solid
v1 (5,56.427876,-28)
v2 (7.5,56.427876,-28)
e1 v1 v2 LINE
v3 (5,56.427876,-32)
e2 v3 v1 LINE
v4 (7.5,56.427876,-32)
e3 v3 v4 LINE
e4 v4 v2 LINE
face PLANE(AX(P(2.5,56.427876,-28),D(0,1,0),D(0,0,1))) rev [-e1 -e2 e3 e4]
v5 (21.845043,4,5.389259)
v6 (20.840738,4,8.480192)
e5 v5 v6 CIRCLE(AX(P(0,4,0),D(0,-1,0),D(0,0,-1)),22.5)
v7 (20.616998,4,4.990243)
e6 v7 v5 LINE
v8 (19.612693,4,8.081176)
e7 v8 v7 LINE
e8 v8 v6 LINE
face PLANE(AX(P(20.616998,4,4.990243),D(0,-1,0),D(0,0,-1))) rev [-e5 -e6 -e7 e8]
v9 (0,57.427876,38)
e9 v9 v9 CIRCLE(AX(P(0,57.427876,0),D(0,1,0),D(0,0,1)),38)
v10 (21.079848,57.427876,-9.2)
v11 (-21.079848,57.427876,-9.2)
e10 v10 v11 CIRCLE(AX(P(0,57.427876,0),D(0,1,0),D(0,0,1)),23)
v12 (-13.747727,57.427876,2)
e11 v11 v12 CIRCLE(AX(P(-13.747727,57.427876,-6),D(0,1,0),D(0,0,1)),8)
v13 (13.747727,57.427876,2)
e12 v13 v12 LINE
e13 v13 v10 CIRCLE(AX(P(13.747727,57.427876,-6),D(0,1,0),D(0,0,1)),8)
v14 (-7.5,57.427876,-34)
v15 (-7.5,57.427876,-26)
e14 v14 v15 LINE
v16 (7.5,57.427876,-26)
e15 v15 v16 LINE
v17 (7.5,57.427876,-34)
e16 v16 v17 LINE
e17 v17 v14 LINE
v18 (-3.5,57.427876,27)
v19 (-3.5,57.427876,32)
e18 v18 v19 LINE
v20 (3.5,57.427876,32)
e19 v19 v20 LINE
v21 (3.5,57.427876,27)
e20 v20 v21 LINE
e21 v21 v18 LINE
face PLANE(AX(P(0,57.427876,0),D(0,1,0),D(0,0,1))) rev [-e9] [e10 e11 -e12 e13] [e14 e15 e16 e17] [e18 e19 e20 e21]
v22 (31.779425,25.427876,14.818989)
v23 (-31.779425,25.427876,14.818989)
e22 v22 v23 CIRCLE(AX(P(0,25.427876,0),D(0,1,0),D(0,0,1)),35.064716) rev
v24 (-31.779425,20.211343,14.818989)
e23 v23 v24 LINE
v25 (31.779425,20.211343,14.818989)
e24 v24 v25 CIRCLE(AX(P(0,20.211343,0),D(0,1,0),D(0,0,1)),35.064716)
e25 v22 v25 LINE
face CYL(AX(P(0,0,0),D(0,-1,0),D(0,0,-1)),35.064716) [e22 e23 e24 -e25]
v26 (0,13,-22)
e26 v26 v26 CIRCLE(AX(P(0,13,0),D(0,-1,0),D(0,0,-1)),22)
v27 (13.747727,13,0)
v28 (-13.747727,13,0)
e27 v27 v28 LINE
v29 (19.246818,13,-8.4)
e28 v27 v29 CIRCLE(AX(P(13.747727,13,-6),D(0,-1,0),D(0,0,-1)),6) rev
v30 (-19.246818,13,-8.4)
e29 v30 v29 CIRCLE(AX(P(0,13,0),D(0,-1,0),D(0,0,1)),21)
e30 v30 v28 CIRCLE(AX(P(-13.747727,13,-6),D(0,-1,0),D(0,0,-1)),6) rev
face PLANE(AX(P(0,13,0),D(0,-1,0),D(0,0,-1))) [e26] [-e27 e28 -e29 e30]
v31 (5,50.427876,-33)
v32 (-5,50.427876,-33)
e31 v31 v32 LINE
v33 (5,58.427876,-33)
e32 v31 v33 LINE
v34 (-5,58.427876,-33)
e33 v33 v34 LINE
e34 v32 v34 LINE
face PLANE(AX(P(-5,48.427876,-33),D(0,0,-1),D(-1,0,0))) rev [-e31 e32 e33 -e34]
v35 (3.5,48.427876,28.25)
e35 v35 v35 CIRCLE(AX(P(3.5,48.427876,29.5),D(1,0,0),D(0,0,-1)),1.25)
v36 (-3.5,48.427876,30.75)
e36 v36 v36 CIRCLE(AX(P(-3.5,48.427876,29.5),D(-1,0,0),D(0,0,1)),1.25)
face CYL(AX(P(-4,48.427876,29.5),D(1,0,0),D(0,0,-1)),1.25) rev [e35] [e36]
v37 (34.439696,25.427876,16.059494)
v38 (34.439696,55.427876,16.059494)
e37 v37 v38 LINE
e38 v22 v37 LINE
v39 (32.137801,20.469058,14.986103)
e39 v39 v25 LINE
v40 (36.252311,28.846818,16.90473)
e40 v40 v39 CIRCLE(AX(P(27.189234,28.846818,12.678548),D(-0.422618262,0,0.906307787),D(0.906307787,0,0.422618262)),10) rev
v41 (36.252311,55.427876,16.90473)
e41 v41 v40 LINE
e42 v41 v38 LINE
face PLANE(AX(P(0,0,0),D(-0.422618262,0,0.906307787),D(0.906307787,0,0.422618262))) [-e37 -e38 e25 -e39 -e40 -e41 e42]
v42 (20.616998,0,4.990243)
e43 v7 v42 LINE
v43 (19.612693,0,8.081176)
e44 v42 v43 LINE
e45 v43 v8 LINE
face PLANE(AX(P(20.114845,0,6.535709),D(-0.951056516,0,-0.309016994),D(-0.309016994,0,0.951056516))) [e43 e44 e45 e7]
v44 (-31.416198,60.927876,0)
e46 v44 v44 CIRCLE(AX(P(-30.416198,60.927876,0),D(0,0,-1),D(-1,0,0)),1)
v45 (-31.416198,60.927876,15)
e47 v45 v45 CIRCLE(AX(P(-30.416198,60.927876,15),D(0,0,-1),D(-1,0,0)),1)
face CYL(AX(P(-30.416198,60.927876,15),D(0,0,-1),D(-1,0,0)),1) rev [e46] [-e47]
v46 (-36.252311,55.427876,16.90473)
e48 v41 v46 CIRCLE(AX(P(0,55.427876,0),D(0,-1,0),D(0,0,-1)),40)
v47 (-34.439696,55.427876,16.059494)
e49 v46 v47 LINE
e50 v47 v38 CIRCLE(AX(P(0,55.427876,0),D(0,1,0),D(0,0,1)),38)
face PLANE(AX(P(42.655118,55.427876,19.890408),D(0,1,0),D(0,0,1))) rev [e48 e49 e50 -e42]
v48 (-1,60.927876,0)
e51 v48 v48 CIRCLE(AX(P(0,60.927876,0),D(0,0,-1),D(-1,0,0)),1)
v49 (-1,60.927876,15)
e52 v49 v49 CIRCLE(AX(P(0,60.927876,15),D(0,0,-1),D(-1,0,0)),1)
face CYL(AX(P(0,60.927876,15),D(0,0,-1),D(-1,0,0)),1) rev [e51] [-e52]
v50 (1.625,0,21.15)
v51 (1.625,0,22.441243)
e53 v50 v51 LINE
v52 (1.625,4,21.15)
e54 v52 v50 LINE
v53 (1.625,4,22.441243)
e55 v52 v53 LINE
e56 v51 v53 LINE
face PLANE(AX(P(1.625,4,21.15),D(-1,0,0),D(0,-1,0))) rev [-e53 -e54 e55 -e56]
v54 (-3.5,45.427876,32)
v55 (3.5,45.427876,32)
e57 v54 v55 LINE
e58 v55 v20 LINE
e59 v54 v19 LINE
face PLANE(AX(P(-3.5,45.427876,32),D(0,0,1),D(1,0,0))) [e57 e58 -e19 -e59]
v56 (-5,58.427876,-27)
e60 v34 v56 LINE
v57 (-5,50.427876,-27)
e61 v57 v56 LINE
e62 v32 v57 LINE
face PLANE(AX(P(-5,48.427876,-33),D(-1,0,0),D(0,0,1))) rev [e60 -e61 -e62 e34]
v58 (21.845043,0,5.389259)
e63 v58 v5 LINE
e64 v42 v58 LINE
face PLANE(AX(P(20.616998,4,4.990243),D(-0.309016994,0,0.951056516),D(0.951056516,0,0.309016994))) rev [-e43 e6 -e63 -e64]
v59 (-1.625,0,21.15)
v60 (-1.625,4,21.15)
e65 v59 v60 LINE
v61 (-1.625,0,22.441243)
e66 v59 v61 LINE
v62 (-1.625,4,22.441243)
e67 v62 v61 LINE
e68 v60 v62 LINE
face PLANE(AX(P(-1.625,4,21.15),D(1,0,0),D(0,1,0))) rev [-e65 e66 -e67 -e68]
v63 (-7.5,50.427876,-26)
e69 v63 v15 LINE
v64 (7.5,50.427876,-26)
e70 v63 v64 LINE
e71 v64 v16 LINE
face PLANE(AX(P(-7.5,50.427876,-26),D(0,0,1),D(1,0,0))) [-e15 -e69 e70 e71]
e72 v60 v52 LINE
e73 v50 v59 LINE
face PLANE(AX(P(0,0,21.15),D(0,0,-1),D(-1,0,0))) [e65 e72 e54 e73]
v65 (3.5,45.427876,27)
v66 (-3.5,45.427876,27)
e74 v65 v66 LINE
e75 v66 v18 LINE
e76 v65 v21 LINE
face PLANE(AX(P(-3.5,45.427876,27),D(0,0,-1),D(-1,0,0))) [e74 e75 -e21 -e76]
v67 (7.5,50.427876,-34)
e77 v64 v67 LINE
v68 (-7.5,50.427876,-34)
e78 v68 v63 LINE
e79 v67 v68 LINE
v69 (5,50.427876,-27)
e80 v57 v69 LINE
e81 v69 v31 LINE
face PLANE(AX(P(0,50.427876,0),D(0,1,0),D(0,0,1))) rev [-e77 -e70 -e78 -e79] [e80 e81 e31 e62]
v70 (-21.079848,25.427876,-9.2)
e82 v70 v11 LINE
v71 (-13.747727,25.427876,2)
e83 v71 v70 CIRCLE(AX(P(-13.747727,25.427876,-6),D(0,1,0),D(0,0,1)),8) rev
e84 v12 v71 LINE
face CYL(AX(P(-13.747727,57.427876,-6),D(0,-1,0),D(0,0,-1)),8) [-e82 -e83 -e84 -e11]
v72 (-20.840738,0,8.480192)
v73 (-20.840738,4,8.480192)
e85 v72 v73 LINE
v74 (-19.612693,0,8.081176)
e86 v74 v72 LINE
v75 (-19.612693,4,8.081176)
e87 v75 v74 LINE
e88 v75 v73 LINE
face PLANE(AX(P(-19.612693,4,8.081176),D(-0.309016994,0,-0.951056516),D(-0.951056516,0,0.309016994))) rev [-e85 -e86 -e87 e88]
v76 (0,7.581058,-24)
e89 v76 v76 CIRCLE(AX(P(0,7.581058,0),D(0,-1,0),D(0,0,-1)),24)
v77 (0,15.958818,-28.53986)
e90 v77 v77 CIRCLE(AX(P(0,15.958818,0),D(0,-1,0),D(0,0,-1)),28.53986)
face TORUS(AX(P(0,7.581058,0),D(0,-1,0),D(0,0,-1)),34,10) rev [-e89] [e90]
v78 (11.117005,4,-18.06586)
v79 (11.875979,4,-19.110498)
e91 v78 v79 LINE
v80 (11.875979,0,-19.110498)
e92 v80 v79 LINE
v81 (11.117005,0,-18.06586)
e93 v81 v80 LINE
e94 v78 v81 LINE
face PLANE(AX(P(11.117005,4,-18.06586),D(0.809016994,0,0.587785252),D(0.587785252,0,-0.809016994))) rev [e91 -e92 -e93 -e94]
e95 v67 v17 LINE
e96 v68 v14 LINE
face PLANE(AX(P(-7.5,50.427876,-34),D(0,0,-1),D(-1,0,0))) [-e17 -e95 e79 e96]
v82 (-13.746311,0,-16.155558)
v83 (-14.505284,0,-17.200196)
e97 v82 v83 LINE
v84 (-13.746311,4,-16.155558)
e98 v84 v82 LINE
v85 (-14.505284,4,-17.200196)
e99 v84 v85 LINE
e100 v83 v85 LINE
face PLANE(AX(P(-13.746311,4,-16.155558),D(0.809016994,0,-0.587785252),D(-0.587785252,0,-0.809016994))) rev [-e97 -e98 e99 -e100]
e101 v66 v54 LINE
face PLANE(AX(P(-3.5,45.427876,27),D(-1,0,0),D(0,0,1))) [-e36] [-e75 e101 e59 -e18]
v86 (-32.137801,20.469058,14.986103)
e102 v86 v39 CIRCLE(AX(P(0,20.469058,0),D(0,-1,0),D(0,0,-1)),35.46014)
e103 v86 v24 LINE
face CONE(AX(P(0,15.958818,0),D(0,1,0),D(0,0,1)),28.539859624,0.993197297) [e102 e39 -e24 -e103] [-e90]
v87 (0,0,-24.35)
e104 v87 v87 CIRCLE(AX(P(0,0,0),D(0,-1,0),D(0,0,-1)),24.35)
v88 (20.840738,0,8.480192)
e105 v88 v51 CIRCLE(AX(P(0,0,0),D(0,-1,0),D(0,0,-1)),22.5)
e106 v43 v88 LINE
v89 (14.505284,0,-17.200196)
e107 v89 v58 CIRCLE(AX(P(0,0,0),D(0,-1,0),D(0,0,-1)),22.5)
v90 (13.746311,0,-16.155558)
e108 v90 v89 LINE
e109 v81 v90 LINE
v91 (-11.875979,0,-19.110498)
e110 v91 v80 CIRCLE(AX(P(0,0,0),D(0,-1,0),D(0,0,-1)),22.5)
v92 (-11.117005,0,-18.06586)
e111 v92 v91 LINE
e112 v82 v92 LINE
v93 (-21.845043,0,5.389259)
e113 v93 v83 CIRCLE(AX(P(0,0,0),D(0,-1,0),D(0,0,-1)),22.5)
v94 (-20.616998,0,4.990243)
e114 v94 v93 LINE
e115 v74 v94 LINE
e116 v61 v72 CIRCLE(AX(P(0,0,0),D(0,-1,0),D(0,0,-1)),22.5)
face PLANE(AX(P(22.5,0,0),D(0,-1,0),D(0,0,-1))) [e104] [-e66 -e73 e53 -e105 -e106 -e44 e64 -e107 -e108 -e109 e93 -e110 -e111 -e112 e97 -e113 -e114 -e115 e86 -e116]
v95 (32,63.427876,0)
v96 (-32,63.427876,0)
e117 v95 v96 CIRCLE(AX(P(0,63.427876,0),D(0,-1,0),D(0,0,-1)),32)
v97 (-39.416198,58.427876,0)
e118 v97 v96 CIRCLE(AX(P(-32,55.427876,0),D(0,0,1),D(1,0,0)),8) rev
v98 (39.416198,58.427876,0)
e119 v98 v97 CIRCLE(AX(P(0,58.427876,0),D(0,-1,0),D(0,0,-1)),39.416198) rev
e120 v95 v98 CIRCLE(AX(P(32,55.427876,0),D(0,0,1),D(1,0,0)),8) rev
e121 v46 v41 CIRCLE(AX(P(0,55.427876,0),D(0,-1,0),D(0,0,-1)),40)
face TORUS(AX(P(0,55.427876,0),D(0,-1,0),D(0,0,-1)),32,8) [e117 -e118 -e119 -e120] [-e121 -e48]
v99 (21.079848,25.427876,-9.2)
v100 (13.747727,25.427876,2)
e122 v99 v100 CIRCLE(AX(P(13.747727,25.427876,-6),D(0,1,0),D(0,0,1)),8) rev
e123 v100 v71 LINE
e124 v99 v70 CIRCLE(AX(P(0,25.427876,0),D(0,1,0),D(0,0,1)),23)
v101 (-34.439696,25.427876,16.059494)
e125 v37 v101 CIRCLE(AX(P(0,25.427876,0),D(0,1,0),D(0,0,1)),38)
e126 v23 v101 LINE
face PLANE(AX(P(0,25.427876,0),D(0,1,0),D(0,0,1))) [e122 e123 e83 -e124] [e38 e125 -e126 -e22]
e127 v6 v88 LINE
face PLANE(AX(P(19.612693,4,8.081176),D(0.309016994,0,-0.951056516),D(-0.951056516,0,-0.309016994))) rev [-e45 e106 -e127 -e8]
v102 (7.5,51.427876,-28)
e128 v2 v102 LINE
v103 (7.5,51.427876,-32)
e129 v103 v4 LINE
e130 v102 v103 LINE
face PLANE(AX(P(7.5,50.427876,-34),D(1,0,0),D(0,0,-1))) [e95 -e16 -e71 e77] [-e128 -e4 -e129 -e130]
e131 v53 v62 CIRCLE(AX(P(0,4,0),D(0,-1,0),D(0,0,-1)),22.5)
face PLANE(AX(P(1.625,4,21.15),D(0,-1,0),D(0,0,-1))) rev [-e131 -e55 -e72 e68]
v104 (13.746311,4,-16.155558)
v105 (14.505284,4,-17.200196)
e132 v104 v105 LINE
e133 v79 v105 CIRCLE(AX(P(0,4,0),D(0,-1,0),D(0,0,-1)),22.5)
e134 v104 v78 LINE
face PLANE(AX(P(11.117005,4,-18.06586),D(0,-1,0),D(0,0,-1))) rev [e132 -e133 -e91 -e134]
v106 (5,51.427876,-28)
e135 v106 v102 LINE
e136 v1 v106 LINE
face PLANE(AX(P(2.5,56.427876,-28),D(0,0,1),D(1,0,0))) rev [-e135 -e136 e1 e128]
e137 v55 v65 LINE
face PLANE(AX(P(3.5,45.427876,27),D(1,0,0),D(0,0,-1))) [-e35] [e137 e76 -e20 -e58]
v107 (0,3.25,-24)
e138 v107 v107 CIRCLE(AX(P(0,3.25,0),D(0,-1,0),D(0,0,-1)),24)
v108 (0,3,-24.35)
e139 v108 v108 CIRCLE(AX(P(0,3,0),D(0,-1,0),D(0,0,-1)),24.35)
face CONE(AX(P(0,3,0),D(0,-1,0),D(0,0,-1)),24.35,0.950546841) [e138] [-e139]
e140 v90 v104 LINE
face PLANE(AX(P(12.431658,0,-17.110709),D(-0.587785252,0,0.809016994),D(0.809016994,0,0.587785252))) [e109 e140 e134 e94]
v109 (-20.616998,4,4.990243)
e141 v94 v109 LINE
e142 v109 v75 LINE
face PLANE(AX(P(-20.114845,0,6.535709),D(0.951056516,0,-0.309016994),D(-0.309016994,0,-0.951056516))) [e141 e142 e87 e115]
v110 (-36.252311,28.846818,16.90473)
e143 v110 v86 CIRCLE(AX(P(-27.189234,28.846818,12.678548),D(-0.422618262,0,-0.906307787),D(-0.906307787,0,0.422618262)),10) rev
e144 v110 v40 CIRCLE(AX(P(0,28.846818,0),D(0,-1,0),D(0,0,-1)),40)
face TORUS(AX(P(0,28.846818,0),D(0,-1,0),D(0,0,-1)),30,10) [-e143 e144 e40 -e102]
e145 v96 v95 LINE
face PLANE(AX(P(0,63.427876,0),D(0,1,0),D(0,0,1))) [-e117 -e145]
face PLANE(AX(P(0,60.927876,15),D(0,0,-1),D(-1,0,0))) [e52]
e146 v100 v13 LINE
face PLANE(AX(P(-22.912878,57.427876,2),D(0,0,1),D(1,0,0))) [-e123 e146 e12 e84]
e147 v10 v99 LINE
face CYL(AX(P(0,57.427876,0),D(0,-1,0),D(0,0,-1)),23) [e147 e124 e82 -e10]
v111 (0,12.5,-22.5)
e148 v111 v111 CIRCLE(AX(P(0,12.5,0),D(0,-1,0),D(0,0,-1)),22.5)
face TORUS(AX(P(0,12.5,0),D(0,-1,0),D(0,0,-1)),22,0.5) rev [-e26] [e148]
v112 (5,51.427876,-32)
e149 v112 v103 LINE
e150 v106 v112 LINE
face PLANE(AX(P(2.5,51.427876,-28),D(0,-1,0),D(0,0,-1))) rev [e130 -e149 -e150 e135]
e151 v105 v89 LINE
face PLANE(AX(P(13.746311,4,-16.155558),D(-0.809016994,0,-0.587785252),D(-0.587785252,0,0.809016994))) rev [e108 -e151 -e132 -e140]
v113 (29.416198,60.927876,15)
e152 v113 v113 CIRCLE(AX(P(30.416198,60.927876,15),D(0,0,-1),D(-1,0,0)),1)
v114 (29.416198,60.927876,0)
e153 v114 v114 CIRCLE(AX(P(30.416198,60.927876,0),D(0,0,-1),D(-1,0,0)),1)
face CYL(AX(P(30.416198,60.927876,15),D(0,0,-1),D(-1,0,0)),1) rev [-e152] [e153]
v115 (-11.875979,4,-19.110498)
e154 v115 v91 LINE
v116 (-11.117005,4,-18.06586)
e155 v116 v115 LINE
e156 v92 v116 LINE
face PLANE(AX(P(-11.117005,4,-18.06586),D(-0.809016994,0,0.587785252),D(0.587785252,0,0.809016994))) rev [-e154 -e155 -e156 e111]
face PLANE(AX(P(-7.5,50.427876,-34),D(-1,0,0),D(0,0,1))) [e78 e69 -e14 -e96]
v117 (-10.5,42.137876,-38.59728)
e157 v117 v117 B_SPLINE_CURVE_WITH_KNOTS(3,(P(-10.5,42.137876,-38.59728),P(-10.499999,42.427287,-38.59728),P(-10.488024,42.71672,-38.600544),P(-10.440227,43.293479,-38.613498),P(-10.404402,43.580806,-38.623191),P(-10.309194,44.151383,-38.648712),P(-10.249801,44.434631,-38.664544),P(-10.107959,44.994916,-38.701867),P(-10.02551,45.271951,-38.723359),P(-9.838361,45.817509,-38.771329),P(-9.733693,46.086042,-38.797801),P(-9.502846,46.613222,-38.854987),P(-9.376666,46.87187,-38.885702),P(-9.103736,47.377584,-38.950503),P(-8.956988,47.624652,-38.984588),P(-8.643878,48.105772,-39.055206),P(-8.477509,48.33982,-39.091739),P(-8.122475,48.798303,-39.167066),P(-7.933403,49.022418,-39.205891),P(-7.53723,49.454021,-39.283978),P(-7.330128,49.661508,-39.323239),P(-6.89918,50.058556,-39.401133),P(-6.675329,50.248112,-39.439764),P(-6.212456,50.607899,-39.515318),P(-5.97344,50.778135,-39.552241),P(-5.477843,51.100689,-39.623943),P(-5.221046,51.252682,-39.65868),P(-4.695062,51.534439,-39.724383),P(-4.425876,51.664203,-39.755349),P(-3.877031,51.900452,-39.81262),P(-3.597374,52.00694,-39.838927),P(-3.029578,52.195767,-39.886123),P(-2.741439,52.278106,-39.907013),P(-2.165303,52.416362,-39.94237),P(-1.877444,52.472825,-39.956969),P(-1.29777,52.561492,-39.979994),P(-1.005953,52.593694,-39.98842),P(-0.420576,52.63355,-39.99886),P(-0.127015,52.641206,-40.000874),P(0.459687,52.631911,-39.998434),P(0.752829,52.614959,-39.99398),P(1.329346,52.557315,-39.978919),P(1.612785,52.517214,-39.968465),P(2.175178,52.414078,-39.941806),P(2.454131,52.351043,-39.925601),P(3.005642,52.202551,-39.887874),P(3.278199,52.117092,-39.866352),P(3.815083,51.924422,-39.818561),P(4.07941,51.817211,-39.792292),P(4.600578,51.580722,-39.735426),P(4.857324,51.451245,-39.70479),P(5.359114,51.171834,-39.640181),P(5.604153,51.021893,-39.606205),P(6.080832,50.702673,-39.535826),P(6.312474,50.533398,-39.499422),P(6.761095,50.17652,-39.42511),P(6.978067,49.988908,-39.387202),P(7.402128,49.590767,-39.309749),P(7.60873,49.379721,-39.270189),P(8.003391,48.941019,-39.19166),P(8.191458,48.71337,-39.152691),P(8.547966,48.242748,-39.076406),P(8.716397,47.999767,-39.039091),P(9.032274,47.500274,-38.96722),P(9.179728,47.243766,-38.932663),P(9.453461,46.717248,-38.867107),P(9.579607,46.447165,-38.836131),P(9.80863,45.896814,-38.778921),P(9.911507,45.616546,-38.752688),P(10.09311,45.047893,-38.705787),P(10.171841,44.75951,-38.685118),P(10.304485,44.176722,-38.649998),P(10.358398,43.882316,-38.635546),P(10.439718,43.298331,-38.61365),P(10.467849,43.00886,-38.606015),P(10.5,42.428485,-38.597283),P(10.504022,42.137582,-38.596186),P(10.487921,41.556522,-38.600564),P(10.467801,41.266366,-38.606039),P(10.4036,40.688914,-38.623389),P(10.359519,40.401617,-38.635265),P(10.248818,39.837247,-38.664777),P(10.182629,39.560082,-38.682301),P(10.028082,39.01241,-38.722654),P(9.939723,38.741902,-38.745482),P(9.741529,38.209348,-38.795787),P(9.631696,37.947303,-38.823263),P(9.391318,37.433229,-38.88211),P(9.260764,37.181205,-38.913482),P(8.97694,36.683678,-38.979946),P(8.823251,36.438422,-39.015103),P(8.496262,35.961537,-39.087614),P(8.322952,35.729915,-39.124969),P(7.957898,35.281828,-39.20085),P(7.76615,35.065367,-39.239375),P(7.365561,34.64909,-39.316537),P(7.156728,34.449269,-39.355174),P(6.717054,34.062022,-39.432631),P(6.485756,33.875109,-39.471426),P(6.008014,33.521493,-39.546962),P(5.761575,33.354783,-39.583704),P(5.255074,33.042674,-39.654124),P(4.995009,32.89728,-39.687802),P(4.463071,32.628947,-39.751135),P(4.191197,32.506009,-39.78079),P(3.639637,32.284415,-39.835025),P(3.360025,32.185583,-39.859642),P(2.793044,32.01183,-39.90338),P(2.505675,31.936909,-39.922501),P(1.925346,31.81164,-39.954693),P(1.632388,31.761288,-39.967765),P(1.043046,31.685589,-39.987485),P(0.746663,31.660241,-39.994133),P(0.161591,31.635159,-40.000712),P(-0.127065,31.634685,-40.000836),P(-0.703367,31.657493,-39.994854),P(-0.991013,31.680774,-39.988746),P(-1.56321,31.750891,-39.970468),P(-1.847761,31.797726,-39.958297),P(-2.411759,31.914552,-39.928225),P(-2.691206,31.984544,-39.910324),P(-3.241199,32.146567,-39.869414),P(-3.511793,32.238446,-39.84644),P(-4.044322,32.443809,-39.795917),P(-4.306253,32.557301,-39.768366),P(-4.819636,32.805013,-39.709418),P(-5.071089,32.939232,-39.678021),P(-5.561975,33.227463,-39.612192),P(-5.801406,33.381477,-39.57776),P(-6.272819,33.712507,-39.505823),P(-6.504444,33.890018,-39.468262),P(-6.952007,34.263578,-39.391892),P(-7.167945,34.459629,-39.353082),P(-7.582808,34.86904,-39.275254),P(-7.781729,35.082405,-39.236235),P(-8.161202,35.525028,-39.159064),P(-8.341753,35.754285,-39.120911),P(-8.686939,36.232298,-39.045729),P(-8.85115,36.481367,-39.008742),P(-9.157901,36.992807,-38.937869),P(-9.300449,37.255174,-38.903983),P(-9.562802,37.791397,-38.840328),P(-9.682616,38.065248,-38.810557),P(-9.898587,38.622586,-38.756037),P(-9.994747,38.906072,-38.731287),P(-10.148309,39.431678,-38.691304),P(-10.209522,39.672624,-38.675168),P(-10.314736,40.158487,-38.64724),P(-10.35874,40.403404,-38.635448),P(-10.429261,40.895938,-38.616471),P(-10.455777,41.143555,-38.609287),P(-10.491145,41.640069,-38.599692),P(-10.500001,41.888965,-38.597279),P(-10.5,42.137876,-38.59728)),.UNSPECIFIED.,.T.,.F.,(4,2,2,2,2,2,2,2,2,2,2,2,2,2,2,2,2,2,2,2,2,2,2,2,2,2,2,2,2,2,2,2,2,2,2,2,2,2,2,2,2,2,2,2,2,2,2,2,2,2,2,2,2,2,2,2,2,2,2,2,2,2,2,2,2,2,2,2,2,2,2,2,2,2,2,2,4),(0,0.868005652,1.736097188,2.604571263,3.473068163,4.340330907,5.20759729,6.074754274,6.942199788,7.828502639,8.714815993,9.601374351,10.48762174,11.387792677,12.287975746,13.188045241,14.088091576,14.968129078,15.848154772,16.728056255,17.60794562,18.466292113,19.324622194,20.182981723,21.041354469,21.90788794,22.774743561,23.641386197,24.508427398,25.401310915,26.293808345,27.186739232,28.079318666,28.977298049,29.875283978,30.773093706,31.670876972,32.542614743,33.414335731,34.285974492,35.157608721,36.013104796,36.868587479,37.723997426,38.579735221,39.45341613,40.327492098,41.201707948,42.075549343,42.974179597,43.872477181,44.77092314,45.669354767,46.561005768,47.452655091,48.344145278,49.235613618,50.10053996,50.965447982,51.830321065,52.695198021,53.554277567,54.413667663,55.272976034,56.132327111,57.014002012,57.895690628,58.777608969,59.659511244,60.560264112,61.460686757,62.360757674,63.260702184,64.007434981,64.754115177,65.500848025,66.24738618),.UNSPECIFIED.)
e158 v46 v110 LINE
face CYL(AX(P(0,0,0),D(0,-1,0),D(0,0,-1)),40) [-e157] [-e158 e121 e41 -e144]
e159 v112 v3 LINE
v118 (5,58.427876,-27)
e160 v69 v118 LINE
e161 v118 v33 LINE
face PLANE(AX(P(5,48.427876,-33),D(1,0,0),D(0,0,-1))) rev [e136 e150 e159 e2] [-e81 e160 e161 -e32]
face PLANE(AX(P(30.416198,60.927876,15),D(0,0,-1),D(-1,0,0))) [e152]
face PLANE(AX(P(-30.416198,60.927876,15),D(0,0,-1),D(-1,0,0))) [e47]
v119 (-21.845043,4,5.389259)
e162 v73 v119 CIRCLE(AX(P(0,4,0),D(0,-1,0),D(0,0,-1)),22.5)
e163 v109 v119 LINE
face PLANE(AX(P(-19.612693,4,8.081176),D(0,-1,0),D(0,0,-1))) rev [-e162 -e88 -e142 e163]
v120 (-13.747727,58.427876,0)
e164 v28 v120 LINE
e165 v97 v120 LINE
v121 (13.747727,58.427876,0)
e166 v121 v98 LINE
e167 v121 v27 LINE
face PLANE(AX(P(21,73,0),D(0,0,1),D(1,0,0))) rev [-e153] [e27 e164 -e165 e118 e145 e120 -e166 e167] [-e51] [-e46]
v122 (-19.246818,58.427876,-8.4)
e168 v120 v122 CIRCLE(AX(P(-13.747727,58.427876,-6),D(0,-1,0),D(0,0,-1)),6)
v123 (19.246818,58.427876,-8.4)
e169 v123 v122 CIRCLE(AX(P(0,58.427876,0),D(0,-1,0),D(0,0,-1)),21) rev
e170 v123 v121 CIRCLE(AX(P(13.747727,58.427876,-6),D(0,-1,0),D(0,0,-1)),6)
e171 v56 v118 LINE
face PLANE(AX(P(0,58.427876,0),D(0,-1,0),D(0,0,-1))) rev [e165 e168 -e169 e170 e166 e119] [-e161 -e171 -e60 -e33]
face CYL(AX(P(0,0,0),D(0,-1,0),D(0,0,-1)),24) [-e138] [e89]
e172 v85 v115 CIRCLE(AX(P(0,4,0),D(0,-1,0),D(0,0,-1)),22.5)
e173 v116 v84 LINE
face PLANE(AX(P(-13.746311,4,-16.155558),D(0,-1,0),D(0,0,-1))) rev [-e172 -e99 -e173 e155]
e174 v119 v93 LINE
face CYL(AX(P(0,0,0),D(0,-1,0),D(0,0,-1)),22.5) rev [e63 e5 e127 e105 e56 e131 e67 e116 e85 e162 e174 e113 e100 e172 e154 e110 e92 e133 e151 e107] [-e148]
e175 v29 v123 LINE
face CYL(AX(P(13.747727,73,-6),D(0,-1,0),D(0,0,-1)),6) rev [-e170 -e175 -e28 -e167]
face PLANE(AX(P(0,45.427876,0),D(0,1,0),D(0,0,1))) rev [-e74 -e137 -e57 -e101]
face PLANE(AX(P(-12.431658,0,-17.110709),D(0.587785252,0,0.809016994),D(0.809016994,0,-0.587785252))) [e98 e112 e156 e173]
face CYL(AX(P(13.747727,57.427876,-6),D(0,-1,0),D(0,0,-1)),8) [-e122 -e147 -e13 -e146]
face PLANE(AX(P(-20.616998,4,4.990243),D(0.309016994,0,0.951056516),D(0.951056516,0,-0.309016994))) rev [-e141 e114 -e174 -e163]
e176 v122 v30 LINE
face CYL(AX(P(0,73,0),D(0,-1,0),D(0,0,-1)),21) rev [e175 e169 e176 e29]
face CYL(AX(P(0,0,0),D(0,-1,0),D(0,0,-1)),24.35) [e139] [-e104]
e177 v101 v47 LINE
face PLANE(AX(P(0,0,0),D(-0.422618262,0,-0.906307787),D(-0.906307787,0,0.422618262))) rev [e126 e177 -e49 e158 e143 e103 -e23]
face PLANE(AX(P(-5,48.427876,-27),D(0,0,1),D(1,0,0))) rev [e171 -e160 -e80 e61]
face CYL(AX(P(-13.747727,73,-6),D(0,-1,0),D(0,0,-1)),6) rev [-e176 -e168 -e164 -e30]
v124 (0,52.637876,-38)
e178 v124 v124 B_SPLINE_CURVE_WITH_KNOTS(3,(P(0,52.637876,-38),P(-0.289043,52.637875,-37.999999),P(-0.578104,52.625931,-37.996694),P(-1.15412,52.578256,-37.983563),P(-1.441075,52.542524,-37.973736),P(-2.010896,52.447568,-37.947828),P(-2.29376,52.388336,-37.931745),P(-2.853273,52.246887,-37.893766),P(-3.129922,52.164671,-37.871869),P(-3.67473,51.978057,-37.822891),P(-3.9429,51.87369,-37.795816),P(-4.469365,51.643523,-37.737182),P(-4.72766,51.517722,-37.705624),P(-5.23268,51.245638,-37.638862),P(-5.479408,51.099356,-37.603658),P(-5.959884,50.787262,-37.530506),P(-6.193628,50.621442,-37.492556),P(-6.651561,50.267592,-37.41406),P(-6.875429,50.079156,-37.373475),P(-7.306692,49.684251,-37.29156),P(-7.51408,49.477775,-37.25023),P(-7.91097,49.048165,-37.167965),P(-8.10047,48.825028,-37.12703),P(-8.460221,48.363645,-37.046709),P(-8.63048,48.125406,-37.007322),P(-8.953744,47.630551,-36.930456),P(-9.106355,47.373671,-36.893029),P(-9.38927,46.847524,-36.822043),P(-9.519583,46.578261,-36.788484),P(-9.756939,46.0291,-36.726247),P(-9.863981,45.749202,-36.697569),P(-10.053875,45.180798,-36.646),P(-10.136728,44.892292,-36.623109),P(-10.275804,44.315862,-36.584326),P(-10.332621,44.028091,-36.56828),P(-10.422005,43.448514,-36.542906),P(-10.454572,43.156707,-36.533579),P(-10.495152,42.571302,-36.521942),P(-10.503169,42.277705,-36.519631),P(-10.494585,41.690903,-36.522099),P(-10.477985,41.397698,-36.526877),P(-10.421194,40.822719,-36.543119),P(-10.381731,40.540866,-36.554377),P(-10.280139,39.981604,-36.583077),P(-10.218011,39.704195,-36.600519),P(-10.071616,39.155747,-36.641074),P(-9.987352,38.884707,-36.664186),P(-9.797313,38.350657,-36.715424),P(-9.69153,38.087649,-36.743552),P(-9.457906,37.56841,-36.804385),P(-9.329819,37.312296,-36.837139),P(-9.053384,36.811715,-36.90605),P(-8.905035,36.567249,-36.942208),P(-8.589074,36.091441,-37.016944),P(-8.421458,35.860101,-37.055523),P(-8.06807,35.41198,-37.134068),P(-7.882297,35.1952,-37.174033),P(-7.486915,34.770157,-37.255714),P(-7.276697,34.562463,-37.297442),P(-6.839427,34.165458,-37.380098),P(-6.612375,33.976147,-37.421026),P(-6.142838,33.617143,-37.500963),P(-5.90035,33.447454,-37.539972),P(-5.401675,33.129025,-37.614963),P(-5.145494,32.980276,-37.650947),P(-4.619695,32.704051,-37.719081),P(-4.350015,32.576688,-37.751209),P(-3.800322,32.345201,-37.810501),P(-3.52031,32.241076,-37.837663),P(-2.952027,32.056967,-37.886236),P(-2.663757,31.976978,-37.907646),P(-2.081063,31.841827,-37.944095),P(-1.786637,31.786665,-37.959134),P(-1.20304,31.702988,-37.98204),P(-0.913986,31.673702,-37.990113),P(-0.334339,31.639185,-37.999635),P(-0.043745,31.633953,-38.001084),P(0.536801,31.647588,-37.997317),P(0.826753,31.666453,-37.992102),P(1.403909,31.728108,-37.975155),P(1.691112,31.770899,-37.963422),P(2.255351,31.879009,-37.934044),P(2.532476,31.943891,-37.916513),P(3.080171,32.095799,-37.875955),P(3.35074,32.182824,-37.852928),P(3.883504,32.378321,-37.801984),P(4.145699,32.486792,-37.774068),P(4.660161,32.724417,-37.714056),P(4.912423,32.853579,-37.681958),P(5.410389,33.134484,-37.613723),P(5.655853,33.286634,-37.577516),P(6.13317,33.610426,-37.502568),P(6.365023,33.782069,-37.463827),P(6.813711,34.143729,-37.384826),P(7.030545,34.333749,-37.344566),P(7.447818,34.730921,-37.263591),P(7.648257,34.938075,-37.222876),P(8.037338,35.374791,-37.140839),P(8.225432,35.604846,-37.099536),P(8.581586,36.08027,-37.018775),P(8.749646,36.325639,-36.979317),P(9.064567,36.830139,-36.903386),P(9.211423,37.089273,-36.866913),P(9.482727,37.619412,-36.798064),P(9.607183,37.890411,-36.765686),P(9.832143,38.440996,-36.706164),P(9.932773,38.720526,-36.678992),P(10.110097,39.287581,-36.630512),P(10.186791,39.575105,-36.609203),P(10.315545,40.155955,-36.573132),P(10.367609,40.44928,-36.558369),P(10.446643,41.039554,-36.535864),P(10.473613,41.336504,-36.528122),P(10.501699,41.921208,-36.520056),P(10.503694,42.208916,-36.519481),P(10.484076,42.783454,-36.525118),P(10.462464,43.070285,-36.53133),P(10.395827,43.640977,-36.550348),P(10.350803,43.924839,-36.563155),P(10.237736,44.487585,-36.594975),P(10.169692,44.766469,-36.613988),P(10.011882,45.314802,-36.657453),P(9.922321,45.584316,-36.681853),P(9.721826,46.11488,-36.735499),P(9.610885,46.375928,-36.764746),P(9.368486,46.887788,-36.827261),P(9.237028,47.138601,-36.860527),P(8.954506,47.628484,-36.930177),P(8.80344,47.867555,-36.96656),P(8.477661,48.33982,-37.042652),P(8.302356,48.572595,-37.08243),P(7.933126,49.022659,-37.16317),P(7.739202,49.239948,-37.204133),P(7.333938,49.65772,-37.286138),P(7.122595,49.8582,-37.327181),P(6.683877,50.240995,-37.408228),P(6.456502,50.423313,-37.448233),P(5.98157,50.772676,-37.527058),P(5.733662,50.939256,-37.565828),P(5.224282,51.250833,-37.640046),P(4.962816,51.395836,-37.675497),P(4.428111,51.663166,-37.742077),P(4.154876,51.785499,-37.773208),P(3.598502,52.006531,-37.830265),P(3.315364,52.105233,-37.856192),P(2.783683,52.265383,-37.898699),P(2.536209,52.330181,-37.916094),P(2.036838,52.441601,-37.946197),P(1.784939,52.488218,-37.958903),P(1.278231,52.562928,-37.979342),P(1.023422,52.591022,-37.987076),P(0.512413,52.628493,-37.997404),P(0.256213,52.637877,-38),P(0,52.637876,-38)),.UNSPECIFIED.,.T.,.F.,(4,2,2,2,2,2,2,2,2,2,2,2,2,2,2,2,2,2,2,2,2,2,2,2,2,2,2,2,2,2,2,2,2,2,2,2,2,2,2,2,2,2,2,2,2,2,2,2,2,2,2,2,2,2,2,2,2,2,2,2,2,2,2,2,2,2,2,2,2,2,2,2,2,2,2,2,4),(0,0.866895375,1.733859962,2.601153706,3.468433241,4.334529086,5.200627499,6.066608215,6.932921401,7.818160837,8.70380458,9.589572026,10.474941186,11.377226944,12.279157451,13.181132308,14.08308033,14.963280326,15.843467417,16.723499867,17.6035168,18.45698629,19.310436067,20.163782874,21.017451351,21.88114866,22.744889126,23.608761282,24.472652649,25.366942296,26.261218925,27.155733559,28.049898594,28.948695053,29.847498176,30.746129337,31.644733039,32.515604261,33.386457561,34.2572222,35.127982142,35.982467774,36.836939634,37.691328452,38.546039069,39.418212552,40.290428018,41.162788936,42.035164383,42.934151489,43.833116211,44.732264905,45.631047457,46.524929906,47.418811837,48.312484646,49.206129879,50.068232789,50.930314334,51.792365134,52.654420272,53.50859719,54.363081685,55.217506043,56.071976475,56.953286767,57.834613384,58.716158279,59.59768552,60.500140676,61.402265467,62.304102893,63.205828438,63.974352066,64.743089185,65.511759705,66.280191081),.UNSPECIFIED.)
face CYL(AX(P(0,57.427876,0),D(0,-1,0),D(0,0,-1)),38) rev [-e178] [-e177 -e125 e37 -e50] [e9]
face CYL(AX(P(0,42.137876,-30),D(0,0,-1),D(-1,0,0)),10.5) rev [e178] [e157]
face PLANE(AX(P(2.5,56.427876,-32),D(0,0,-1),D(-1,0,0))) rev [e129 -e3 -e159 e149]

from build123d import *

# Parameters (mm, degrees)
CUT_EXTRUDE3_DEPTH           = 60
CUT_EXTRUDE5_DEPTH           = 2
CUT_EXTRUDE5_DEPTH_BACK      = 30
SKETCH9_R                    = 38
SKETCH9_R_2                  = 23
SKETCH19_W                   = 12
SKETCH19_H                   = 36.5
CUT_REVOLVE2_ANGLE           = 65
CUT_REVOLVE2_OTHER_WAY_ANGLE = 65
SKETCH21_W                   = 3.25
SKETCH21_H                   = 4
BOSS_EXTRUDE3_DEPTH          = 1.35
CIRPATTERN1_COUNT            = 5
CUT_EXTRUDE9_START           = -5
CUT_EXTRUDE9_DEPTH           = 5
SKETCH23_R                   = 10.5
CUT_EXTRUDE10_DEPTH          = 10
SKETCH24_W                   = 15
SKETCH24_H                   = 8
BOSS_EXTRUDE4_DEPTH          = 8
SKETCH26_W                   = 10
SKETCH26_H                   = 6
CUT_EXTRUDE11_DEPTH          = 10
SKETCH27_W                   = 4
SKETCH27_H                   = 5
CUT_EXTRUDE12_DEPTH          = 5
CUT_EXTRUDE14_DEPTH          = 2
CUT_EXTRUDE14_DEPTH_BACK     = 30
SKETCH29_R                   = 1
CUT_EXTRUDE15_DEPTH          = 15
FILLET1_R                    = 6
FILLET2_R                    = 8
SKETCH31_W                   = 7
SKETCH31_H                   = 5
BOSS_EXTRUDE7_DEPTH          = 13
SKETCH32_R                   = 1.25
CUT_EXTRUDE16_DEPTH          = 7.5


with BuildPart() as part:
    # Sketch1 → Revolve1 (revolve)
    with BuildSketch(Plane.XY):
        with BuildLine():
            Line((0, 63.427876097), (32, 63.427876097))
            ThreePointArc((32, 63.427876097), (37.656854249, 61.084730346), (40, 55.427876097))
            Line((40, 55.427876097), (40, 28.846818009))
            ThreePointArc((40, 28.846818009), (38.792081772, 24.082439968), (35.460140376, 20.469057744))
            Line((35.460140376, 20.469057744), (28.539859624, 15.958818353))
            ThreePointArc((28.539859624, 15.958818353), (25.207918228, 12.345436129), (24, 7.581058088))
            Line((24, 7.581058088), (24, 3.25))
            Line((24, 3.25), (24.35, 3))
            Line((24.35, 3), (24.35, 0))
            Line((24.35, 0), (22.5, 0))
            Line((22.5, 0), (22.5, 12.5))
            ThreePointArc((22.5, 12.5), (22.353553391, 12.853553391), (22, 13))
            Line((22, 13), (0, 13))
            Line((0, 13), (0, 63.427876097))
        make_face()
    revolve(axis=Axis((0, 0, 0), (0, 1, 0)))

    # Sketch11 → Cut-Extrude3 (cut)
    with BuildSketch(Plane(origin=(0, 13, 0), x_dir=(-1, 0, 0), z_dir=(0, -1, 0))):
        with BuildLine():
            Line((-21, 0), (21, 0))
            ThreePointArc((21, 0), (0, 21), (-21, 0))
        make_face()
    extrude(amount=-CUT_EXTRUDE3_DEPTH, mode=Mode.SUBTRACT)

    # Sketch9 → Cut-Extrude5 (cut, two sides: drawn at the far end of the back side and taken through both)
    with BuildSketch(Plane(origin=(0, 55.427876097, 0), x_dir=(1, 0, 0), z_dir=(0, 1, 0)).offset(-CUT_EXTRUDE5_DEPTH_BACK)):
        Circle(SKETCH9_R)
        Circle(SKETCH9_R_2, mode=Mode.SUBTRACT)
    extrude(amount=CUT_EXTRUDE5_DEPTH + CUT_EXTRUDE5_DEPTH_BACK, mode=Mode.SUBTRACT)

    # Sketch19 → Cut-Revolve2 (revolve, cut)
    with BuildSketch(Plane(origin=(0, 0, 0), x_dir=(0, 0, -1), z_dir=(1, 0, 0))):
        with Locations((-41.064715832, 37.177876097)):
            Rectangle(SKETCH19_W, SKETCH19_H)
    revolve(axis=Axis((0, 0, 0), (0, 1, 0)), revolution_arc=CUT_REVOLVE2_ANGLE, mode=Mode.SUBTRACT)

    # Sketch19 → Cut-Revolve2 other way (revolve, cut)
    with BuildSketch(Plane(origin=(0, 0, 0), x_dir=(0, 0, -1), z_dir=(1, 0, 0))):
        with Locations((-41.064715832, 37.177876097)):
            Rectangle(SKETCH19_W, SKETCH19_H)
    revolve(axis=Axis((0, 0, 0), (0, -1, 0)), revolution_arc=CUT_REVOLVE2_OTHER_WAY_ANGLE, mode=Mode.SUBTRACT)

    # Sketch21 → Boss-Extrude3 (add)
    with BuildSketch(Plane(origin=(0, 0, 22.5), x_dir=(-1, 0, 0), z_dir=(0, 0, -1))):
        with Locations((0, 2)):
            Rectangle(SKETCH21_W, SKETCH21_H)
    boss_extrude3 = extrude(amount=BOSS_EXTRUDE3_DEPTH)

    # CirPattern1: Boss-Extrude3 ×5 about axis
    cirpattern1_axis = Axis((0, 0, 0), (0, -1, 0))
    for i in range(1, CIRPATTERN1_COUNT):
        add(boss_extrude3.rotate(cirpattern1_axis, i * 360 / CIRPATTERN1_COUNT))

    # Sketch22 → Cut-Extrude9 (cut)
    with BuildSketch(Plane(origin=(0, 63.427876097, 0), x_dir=(1, 0, 0), z_dir=(0, 1, 0)).offset(CUT_EXTRUDE9_START)):
        with BuildLine():
            Line((-40, 0), (40, 0))
            ThreePointArc((40, 0), (0, 40), (-40, 0))
        make_face()
    extrude(amount=CUT_EXTRUDE9_DEPTH, mode=Mode.SUBTRACT)

    # Sketch23 → Cut-Extrude10 (cut)
    with BuildSketch(Plane(origin=(0, 0, -40), x_dir=(-1, 0, 0), z_dir=(0, 0, -1))):
        with Locations((0, 42.137876097)):
            Circle(SKETCH23_R)
    extrude(amount=-CUT_EXTRUDE10_DEPTH, mode=Mode.SUBTRACT)

    # Sketch24 → Boss-Extrude4 (add)
    with BuildSketch(Plane(origin=(0, 58.427876097, 0), x_dir=(1, 0, 0), z_dir=(0, 1, 0))):
        with Locations((0, 30)):
            Rectangle(SKETCH24_W, SKETCH24_H)
    extrude(amount=-BOSS_EXTRUDE4_DEPTH)

    # Sketch26 → Cut-Extrude11 (cut)
    with BuildSketch(Plane(origin=(0, 58.427876097, 0), x_dir=(1, 0, 0), z_dir=(0, 1, 0))):
        with Locations((0, 30)):
            Rectangle(SKETCH26_W, SKETCH26_H)
    extrude(amount=-CUT_EXTRUDE11_DEPTH, mode=Mode.SUBTRACT)

    # Sketch27 → Cut-Extrude12 (cut)
    with BuildSketch(Plane(origin=(7.5, 0, 0), x_dir=(0, 0, -1), z_dir=(1, 0, 0))):
        with Locations((30, 53.927876097)):
            Rectangle(SKETCH27_W, SKETCH27_H)
    extrude(amount=-CUT_EXTRUDE12_DEPTH, mode=Mode.SUBTRACT)

    # Sketch28 → Cut-Extrude14 (cut, two sides: drawn at the far end of the back side and taken through both)
    with BuildSketch(Plane(origin=(0, 55.427876097, 0), x_dir=(1, 0, 0), z_dir=(0, 1, 0)).offset(-CUT_EXTRUDE14_DEPTH_BACK)):
        with BuildLine():
            Line((-22.912878475, -2), (22.912878475, -2))
            ThreePointArc((22.912878475, -2), (0, -23), (-22.912878475, -2))
        make_face()
    extrude(amount=CUT_EXTRUDE14_DEPTH + CUT_EXTRUDE14_DEPTH_BACK, mode=Mode.SUBTRACT)

    # Sketch29 → Cut-Extrude15 (cut)
    with BuildSketch(Plane(origin=(0, 0, 0), x_dir=(-1, 0, 0), z_dir=(0, 0, -1))):
        with Locations((-30.416198487, 60.927876097)):
            Circle(SKETCH29_R)
        with Locations((30.416198487, 60.927876097)):
            Circle(SKETCH29_R)
        with Locations((0, 60.927876097)):
            Circle(SKETCH29_R)
    extrude(amount=-CUT_EXTRUDE15_DEPTH, mode=Mode.SUBTRACT)

    # Fillet1
    fillet1_edges = [part.edges().sort_by_distance(p)[0] for p in [
        (-21, 35.713938048, 0),
        (21, 35.713938048, 0),
    ]]
    fillet(fillet1_edges, radius=FILLET1_R)

    # Fillet2
    fillet2_edges = [part.edges().sort_by_distance(p)[0] for p in [
        (22.912878475, 41.427876097, 2),
        (-22.912878475, 41.427876097, 2),
    ]]
    fillet(fillet2_edges, radius=FILLET2_R)

    # Sketch31 → Boss-Extrude7 (add)
    with BuildSketch(Plane(origin=(0, 58.427876097, 0), x_dir=(1, 0, 0), z_dir=(0, 1, 0))):
        with Locations((0, -29.5)):
            Rectangle(SKETCH31_W, SKETCH31_H)
    extrude(amount=-BOSS_EXTRUDE7_DEPTH)

    # Sketch32 → Cut-Extrude16 (cut)
    with BuildSketch(Plane(origin=(3.5, 0, 0), x_dir=(0, 0, -1), z_dir=(1, 0, 0))):
        with Locations((-29.5, 48.427876097)):
            Circle(SKETCH32_R)
    extrude(amount=-CUT_EXTRUDE16_DEPTH, mode=Mode.SUBTRACT)


solid = part.part
